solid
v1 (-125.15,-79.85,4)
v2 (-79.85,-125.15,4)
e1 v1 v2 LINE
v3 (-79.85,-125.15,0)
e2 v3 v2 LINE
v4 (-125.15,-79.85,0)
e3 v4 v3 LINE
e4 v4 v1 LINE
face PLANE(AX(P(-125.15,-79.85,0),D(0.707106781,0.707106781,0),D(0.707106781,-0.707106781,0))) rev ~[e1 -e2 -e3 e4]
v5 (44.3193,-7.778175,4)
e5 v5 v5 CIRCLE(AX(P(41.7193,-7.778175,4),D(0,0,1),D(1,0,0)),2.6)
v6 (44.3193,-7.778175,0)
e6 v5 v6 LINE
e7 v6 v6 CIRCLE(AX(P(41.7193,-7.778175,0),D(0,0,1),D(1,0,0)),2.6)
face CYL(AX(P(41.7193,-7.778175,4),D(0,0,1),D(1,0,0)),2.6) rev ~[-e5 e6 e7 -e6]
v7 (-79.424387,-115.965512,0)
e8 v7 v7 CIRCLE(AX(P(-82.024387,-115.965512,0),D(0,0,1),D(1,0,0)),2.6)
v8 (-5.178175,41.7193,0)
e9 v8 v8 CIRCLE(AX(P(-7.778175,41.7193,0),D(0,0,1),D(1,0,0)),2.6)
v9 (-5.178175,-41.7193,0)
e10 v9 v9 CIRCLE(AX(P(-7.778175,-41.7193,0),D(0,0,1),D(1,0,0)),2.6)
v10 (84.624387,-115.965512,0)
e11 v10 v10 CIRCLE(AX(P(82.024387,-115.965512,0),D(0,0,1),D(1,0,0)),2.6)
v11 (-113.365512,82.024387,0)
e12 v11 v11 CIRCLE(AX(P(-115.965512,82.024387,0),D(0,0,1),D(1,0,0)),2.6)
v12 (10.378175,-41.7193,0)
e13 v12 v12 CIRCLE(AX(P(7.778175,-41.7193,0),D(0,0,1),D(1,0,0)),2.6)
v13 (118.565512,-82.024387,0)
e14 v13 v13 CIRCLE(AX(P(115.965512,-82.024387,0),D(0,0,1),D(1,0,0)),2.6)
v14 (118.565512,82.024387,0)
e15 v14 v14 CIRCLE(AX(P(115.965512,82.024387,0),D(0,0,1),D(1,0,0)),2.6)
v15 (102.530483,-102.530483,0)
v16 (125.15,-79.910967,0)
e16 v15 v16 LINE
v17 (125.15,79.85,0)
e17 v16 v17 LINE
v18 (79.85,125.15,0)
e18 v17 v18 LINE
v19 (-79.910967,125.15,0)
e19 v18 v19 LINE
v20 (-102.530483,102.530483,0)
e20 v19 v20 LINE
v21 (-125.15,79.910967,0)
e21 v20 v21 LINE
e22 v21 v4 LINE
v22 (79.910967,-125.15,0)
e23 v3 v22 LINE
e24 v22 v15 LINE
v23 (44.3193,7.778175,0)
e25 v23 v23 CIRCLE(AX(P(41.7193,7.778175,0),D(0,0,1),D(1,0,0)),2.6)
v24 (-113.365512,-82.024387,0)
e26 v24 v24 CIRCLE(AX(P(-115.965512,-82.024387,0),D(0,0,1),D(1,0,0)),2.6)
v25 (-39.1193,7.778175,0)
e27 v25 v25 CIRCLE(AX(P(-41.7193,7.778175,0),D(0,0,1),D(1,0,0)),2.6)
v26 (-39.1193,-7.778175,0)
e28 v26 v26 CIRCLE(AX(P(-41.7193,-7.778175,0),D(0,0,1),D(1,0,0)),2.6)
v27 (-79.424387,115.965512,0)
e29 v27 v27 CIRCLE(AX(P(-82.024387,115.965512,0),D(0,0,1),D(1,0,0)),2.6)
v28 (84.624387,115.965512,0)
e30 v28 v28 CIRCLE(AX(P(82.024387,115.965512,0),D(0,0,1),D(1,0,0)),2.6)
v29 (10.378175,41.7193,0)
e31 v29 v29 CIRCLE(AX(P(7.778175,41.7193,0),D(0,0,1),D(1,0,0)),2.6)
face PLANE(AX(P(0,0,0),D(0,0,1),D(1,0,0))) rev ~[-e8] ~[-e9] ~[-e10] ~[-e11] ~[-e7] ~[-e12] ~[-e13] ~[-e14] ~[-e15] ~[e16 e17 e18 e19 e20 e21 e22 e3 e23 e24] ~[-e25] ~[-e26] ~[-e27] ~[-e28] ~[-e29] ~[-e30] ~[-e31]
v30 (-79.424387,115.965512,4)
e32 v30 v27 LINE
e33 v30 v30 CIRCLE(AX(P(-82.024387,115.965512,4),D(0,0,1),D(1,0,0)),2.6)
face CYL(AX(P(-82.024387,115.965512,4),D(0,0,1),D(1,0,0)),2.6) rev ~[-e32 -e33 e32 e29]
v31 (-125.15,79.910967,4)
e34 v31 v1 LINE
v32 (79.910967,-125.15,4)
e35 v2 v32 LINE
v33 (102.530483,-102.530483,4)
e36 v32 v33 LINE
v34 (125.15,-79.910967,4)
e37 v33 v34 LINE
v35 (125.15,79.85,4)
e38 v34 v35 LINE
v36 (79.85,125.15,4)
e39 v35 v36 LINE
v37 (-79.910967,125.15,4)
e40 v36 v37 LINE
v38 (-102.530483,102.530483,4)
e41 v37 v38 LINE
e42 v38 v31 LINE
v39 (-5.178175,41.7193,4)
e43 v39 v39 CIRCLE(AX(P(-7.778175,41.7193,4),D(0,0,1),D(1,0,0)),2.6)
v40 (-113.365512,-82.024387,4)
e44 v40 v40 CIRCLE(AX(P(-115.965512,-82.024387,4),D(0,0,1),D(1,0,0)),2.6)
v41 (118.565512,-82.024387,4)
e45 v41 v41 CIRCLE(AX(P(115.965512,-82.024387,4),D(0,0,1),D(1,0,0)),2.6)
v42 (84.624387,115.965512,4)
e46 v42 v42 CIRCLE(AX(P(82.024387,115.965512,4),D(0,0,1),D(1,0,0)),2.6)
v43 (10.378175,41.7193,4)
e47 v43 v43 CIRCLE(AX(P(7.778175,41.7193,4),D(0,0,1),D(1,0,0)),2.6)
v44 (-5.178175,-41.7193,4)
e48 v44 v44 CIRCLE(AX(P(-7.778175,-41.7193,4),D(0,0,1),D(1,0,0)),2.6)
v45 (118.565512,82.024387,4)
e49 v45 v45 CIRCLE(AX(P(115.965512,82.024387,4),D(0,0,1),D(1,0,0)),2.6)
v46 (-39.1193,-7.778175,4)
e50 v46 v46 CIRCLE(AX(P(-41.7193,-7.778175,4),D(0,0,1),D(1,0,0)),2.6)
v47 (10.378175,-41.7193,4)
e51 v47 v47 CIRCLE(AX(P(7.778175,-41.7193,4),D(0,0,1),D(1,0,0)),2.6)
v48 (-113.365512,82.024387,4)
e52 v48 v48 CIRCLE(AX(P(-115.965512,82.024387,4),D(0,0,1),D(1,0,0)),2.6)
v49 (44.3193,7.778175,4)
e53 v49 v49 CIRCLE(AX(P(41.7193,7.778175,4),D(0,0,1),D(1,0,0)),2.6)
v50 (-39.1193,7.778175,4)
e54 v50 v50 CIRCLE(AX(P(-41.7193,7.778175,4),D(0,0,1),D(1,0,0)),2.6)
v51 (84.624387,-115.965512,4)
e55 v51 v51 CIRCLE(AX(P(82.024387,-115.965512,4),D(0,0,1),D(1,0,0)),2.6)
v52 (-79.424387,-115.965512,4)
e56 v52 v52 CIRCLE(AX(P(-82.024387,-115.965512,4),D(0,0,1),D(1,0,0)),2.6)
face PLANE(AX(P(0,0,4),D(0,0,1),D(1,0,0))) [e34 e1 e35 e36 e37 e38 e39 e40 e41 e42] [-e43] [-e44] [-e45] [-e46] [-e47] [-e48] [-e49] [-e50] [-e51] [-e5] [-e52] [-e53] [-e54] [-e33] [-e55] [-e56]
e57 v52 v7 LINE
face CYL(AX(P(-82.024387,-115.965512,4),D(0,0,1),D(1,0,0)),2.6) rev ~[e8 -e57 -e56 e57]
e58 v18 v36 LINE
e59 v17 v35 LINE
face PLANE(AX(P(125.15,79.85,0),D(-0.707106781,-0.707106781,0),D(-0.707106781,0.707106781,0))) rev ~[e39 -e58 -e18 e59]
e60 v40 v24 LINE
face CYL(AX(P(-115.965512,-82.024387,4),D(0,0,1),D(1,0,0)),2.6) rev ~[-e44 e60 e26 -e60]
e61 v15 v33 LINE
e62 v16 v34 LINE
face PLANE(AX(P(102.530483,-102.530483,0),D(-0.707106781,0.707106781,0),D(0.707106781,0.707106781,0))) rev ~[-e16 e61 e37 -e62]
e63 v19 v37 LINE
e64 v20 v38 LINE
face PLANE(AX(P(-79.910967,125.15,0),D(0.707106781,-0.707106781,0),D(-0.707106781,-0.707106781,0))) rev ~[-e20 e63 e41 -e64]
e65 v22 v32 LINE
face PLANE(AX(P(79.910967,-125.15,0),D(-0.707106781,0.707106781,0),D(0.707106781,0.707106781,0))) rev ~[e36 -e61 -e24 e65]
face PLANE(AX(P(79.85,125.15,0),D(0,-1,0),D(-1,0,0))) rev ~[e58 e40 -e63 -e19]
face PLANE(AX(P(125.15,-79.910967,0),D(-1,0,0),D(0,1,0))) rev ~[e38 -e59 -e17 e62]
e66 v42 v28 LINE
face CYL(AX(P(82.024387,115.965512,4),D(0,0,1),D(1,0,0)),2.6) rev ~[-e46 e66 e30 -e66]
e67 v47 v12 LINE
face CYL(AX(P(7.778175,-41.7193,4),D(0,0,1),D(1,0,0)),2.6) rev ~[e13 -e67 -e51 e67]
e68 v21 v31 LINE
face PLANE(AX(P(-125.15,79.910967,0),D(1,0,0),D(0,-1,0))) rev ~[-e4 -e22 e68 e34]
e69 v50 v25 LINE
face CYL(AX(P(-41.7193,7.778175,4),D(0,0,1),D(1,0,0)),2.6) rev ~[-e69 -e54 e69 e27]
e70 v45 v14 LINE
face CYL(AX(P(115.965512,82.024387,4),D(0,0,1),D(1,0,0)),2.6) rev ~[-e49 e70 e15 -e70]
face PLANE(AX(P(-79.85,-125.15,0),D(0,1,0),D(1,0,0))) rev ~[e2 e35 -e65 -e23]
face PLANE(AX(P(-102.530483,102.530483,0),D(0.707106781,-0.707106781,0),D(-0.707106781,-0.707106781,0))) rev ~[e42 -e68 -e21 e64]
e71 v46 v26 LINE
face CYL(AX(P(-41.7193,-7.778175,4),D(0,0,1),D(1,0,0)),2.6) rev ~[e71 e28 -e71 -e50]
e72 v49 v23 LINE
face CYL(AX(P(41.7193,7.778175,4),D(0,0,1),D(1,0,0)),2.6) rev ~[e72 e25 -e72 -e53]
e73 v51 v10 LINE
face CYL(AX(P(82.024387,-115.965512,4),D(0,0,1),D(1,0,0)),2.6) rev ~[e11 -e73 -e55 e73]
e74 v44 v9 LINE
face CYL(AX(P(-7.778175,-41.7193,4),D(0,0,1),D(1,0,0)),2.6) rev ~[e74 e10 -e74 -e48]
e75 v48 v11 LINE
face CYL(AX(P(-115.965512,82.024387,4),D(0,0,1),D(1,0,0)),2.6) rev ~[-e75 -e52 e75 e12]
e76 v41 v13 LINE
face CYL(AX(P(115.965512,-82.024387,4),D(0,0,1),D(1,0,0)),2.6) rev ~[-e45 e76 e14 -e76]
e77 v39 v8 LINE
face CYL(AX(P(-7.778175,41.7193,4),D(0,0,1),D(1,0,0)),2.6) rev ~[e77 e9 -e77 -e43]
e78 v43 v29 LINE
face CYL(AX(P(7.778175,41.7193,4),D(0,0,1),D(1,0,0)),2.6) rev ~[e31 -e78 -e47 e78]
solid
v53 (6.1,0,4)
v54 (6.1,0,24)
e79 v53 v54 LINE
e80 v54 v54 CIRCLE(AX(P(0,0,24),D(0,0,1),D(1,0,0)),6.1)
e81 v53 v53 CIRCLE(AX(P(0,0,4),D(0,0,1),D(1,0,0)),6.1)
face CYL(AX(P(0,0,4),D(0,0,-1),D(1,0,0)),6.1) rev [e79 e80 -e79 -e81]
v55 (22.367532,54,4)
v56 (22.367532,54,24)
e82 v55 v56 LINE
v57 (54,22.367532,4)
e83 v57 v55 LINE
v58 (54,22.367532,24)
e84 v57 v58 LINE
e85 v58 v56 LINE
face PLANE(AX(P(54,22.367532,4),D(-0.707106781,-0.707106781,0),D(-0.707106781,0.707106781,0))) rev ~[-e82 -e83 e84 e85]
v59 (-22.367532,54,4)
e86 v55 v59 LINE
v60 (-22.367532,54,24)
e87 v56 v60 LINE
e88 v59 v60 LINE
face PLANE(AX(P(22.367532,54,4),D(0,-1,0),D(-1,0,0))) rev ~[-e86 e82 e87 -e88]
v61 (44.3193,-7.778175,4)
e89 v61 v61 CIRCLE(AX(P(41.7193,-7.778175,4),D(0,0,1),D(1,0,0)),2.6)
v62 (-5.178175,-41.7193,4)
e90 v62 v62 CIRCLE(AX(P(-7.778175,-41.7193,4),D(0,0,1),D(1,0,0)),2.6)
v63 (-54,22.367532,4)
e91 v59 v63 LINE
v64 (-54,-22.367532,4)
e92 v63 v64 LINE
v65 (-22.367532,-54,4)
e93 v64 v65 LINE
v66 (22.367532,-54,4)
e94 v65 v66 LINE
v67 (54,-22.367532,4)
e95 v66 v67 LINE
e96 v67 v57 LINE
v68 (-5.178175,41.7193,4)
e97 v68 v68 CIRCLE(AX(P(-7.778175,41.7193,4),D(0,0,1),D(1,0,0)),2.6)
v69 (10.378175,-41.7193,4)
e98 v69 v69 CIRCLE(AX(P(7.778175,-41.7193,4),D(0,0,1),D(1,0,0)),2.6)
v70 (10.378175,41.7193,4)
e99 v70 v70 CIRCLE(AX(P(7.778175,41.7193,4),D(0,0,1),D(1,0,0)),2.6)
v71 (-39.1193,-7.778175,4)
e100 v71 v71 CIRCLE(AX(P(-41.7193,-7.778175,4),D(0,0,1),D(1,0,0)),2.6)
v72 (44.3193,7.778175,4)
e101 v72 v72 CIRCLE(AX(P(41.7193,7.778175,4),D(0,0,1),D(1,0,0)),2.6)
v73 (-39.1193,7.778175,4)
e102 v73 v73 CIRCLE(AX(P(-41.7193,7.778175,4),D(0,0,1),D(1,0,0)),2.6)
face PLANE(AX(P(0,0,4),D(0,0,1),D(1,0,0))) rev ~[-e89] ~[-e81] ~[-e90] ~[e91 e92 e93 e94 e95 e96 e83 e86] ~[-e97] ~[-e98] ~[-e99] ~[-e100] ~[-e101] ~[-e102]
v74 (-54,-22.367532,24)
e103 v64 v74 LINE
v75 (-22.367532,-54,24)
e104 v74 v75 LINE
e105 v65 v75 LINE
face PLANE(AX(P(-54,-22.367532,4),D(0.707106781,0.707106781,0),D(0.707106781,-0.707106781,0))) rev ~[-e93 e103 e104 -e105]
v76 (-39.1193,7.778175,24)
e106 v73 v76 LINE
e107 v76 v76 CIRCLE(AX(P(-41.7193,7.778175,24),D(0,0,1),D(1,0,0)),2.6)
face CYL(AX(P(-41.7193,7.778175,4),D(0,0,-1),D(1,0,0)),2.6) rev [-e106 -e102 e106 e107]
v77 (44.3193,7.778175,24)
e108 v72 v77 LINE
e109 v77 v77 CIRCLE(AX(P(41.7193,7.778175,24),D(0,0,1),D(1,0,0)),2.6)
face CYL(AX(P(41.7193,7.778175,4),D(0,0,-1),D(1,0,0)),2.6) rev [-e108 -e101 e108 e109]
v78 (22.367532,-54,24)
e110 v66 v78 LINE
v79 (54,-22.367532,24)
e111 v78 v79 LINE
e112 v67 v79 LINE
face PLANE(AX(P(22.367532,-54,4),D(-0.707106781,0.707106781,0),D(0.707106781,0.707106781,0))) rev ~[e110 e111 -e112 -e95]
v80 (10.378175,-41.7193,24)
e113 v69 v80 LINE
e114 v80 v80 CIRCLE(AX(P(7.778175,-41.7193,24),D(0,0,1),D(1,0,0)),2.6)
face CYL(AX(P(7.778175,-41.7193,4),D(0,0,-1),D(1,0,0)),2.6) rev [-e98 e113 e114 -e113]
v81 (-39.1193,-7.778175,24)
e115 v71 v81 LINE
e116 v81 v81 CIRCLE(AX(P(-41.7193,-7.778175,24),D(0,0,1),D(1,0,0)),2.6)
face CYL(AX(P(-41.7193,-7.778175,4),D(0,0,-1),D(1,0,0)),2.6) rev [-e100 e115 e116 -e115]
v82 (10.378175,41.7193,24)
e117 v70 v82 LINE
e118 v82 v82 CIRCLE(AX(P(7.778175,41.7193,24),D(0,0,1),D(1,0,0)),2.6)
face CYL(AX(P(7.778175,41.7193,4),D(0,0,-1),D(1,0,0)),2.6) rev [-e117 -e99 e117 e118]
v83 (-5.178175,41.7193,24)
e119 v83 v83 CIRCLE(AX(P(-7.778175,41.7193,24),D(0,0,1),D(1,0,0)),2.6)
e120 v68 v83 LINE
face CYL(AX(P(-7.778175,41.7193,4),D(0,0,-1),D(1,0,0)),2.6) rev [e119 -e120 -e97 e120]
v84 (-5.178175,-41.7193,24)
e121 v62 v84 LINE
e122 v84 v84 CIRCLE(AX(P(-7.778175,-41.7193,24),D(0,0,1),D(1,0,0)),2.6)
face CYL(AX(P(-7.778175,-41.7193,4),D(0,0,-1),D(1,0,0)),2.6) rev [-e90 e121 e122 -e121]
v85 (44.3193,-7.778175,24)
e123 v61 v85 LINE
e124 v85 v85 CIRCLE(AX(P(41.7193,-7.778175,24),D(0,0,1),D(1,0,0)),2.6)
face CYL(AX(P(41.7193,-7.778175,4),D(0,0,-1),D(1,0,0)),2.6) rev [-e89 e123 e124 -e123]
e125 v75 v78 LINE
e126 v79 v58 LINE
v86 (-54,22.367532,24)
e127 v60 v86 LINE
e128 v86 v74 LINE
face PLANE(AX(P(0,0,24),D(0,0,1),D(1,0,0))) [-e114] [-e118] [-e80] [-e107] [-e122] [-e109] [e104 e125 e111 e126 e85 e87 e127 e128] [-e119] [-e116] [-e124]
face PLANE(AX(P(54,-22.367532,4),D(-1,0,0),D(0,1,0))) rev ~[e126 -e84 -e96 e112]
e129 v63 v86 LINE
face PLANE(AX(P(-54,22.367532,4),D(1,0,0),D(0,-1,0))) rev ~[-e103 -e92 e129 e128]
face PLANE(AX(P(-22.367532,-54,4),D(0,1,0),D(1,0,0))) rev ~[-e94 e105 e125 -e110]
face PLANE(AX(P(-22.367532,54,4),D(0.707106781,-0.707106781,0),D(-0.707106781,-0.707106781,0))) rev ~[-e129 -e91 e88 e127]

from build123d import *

# Parameters (mm, degrees)
F1_DEPTH = 4
F2_R     = 2.6
F3_DEPTH = 20
F4_R     = 2.6
F5_DEPTH = 4.001
F6_R     = 2.6
F6_R_2   = 6.1
F7_DEPTH = 20


# Not quite as in the source:
# - a feature names something its author has since deleted; it is built from what else it names


with BuildPart() as f1:
    # F0 (on Top) → F1 (new body)
    with BuildSketch(Plane.XY):
        Polygon((125.15, 79.85), (102.5, 102.5), (79.85, 125.15), (-79.9109665441, 125.15), (-102.530483272, 102.530483272), (-125.15, 79.9109665441), (-125.15, -79.85), (-102.5, -102.5), (-79.85, -125.15), (79.9109665441, -125.15), (102.530483272, -102.530483272), (125.15, -79.9109665441), align=None)
    extrude(amount=F1_DEPTH)

    # F2 (on face) → F3 (cut)
    with BuildSketch(Plane.XY.offset(4)):
        with Locations((-7.7781745931, 41.71930009)):
            Circle(F2_R)
        with Locations((-41.71930009, 7.7781745931)):
            Circle(F2_R)
        with Locations((7.7781745931, -41.71930009)):
            Circle(F2_R)
        with Locations((41.71930009, -7.7781745931)):
            Circle(F2_R)
        with Locations((41.71930009, 7.7781745931)):
            Circle(F2_R)
        with Locations((7.7781745931, 41.71930009)):
            Circle(F2_R)
        with Locations((-41.71930009, -7.7781745931)):
            Circle(F2_R)
        with Locations((-7.7781745931, -41.71930009)):
            Circle(F2_R)
    extrude(amount=-F3_DEPTH, mode=Mode.SUBTRACT)

    # F4 (on face) → F5 (cut, through all)
    with BuildSketch(Plane.XY.offset(4)):
        with Locations((-82.0243866176, 115.9655121146)):
            Circle(F4_R)
        with Locations((-115.9655121146, 82.0243866176)):
            Circle(F4_R)
        with Locations((82.0243866176, -115.9655121146)):
            Circle(F4_R)
        with Locations((115.9655121146, -82.0243866176)):
            Circle(F4_R)
        with Locations((82.0243866176, 115.9655121146)):
            Circle(F4_R)
        with Locations((115.9655121146, 82.0243866176)):
            Circle(F4_R)
        with Locations((-115.9655121146, -82.0243866176)):
            Circle(F4_R)
        with Locations((-82.0243866176, -115.9655121146)):
            Circle(F4_R)
    extrude(amount=-F5_DEPTH, mode=Mode.SUBTRACT)


with BuildPart() as f7:
    # F6 (on face) → F7 (new body)
    with BuildSketch(Plane.XY.offset(4)):
        Polygon((22.3675323681, 54), (-22.3675323681, 54), (-54, 22.3675323681), (-54, -22.3675323681), (-22.3675323681, -54), (22.3675323681, -54), (54, -22.3675323681), (54, 22.3675323681), align=None)
        with Locations((-7.7781745931, -41.71930009)):
            Circle(F6_R, mode=Mode.SUBTRACT)
        with Locations((-41.71930009, -7.7781745931)):
            Circle(F6_R, mode=Mode.SUBTRACT)
        with Locations((7.7781745931, -41.71930009)):
            Circle(F6_R, mode=Mode.SUBTRACT)
        with Locations((41.71930009, -7.7781745931)):
            Circle(F6_R, mode=Mode.SUBTRACT)
        with Locations((-41.71930009, 7.7781745931)):
            Circle(F6_R, mode=Mode.SUBTRACT)
        with Locations((-7.7781745931, 41.71930009)):
            Circle(F6_R, mode=Mode.SUBTRACT)
        Circle(F6_R_2, mode=Mode.SUBTRACT)
        with Locations((41.71930009, 7.7781745931)):
            Circle(F6_R, mode=Mode.SUBTRACT)
        with Locations((7.7781745931, 41.71930009)):
            Circle(F6_R, mode=Mode.SUBTRACT)
    extrude(amount=F7_DEPTH)


solid = Compound([f1.part, f7.part])
